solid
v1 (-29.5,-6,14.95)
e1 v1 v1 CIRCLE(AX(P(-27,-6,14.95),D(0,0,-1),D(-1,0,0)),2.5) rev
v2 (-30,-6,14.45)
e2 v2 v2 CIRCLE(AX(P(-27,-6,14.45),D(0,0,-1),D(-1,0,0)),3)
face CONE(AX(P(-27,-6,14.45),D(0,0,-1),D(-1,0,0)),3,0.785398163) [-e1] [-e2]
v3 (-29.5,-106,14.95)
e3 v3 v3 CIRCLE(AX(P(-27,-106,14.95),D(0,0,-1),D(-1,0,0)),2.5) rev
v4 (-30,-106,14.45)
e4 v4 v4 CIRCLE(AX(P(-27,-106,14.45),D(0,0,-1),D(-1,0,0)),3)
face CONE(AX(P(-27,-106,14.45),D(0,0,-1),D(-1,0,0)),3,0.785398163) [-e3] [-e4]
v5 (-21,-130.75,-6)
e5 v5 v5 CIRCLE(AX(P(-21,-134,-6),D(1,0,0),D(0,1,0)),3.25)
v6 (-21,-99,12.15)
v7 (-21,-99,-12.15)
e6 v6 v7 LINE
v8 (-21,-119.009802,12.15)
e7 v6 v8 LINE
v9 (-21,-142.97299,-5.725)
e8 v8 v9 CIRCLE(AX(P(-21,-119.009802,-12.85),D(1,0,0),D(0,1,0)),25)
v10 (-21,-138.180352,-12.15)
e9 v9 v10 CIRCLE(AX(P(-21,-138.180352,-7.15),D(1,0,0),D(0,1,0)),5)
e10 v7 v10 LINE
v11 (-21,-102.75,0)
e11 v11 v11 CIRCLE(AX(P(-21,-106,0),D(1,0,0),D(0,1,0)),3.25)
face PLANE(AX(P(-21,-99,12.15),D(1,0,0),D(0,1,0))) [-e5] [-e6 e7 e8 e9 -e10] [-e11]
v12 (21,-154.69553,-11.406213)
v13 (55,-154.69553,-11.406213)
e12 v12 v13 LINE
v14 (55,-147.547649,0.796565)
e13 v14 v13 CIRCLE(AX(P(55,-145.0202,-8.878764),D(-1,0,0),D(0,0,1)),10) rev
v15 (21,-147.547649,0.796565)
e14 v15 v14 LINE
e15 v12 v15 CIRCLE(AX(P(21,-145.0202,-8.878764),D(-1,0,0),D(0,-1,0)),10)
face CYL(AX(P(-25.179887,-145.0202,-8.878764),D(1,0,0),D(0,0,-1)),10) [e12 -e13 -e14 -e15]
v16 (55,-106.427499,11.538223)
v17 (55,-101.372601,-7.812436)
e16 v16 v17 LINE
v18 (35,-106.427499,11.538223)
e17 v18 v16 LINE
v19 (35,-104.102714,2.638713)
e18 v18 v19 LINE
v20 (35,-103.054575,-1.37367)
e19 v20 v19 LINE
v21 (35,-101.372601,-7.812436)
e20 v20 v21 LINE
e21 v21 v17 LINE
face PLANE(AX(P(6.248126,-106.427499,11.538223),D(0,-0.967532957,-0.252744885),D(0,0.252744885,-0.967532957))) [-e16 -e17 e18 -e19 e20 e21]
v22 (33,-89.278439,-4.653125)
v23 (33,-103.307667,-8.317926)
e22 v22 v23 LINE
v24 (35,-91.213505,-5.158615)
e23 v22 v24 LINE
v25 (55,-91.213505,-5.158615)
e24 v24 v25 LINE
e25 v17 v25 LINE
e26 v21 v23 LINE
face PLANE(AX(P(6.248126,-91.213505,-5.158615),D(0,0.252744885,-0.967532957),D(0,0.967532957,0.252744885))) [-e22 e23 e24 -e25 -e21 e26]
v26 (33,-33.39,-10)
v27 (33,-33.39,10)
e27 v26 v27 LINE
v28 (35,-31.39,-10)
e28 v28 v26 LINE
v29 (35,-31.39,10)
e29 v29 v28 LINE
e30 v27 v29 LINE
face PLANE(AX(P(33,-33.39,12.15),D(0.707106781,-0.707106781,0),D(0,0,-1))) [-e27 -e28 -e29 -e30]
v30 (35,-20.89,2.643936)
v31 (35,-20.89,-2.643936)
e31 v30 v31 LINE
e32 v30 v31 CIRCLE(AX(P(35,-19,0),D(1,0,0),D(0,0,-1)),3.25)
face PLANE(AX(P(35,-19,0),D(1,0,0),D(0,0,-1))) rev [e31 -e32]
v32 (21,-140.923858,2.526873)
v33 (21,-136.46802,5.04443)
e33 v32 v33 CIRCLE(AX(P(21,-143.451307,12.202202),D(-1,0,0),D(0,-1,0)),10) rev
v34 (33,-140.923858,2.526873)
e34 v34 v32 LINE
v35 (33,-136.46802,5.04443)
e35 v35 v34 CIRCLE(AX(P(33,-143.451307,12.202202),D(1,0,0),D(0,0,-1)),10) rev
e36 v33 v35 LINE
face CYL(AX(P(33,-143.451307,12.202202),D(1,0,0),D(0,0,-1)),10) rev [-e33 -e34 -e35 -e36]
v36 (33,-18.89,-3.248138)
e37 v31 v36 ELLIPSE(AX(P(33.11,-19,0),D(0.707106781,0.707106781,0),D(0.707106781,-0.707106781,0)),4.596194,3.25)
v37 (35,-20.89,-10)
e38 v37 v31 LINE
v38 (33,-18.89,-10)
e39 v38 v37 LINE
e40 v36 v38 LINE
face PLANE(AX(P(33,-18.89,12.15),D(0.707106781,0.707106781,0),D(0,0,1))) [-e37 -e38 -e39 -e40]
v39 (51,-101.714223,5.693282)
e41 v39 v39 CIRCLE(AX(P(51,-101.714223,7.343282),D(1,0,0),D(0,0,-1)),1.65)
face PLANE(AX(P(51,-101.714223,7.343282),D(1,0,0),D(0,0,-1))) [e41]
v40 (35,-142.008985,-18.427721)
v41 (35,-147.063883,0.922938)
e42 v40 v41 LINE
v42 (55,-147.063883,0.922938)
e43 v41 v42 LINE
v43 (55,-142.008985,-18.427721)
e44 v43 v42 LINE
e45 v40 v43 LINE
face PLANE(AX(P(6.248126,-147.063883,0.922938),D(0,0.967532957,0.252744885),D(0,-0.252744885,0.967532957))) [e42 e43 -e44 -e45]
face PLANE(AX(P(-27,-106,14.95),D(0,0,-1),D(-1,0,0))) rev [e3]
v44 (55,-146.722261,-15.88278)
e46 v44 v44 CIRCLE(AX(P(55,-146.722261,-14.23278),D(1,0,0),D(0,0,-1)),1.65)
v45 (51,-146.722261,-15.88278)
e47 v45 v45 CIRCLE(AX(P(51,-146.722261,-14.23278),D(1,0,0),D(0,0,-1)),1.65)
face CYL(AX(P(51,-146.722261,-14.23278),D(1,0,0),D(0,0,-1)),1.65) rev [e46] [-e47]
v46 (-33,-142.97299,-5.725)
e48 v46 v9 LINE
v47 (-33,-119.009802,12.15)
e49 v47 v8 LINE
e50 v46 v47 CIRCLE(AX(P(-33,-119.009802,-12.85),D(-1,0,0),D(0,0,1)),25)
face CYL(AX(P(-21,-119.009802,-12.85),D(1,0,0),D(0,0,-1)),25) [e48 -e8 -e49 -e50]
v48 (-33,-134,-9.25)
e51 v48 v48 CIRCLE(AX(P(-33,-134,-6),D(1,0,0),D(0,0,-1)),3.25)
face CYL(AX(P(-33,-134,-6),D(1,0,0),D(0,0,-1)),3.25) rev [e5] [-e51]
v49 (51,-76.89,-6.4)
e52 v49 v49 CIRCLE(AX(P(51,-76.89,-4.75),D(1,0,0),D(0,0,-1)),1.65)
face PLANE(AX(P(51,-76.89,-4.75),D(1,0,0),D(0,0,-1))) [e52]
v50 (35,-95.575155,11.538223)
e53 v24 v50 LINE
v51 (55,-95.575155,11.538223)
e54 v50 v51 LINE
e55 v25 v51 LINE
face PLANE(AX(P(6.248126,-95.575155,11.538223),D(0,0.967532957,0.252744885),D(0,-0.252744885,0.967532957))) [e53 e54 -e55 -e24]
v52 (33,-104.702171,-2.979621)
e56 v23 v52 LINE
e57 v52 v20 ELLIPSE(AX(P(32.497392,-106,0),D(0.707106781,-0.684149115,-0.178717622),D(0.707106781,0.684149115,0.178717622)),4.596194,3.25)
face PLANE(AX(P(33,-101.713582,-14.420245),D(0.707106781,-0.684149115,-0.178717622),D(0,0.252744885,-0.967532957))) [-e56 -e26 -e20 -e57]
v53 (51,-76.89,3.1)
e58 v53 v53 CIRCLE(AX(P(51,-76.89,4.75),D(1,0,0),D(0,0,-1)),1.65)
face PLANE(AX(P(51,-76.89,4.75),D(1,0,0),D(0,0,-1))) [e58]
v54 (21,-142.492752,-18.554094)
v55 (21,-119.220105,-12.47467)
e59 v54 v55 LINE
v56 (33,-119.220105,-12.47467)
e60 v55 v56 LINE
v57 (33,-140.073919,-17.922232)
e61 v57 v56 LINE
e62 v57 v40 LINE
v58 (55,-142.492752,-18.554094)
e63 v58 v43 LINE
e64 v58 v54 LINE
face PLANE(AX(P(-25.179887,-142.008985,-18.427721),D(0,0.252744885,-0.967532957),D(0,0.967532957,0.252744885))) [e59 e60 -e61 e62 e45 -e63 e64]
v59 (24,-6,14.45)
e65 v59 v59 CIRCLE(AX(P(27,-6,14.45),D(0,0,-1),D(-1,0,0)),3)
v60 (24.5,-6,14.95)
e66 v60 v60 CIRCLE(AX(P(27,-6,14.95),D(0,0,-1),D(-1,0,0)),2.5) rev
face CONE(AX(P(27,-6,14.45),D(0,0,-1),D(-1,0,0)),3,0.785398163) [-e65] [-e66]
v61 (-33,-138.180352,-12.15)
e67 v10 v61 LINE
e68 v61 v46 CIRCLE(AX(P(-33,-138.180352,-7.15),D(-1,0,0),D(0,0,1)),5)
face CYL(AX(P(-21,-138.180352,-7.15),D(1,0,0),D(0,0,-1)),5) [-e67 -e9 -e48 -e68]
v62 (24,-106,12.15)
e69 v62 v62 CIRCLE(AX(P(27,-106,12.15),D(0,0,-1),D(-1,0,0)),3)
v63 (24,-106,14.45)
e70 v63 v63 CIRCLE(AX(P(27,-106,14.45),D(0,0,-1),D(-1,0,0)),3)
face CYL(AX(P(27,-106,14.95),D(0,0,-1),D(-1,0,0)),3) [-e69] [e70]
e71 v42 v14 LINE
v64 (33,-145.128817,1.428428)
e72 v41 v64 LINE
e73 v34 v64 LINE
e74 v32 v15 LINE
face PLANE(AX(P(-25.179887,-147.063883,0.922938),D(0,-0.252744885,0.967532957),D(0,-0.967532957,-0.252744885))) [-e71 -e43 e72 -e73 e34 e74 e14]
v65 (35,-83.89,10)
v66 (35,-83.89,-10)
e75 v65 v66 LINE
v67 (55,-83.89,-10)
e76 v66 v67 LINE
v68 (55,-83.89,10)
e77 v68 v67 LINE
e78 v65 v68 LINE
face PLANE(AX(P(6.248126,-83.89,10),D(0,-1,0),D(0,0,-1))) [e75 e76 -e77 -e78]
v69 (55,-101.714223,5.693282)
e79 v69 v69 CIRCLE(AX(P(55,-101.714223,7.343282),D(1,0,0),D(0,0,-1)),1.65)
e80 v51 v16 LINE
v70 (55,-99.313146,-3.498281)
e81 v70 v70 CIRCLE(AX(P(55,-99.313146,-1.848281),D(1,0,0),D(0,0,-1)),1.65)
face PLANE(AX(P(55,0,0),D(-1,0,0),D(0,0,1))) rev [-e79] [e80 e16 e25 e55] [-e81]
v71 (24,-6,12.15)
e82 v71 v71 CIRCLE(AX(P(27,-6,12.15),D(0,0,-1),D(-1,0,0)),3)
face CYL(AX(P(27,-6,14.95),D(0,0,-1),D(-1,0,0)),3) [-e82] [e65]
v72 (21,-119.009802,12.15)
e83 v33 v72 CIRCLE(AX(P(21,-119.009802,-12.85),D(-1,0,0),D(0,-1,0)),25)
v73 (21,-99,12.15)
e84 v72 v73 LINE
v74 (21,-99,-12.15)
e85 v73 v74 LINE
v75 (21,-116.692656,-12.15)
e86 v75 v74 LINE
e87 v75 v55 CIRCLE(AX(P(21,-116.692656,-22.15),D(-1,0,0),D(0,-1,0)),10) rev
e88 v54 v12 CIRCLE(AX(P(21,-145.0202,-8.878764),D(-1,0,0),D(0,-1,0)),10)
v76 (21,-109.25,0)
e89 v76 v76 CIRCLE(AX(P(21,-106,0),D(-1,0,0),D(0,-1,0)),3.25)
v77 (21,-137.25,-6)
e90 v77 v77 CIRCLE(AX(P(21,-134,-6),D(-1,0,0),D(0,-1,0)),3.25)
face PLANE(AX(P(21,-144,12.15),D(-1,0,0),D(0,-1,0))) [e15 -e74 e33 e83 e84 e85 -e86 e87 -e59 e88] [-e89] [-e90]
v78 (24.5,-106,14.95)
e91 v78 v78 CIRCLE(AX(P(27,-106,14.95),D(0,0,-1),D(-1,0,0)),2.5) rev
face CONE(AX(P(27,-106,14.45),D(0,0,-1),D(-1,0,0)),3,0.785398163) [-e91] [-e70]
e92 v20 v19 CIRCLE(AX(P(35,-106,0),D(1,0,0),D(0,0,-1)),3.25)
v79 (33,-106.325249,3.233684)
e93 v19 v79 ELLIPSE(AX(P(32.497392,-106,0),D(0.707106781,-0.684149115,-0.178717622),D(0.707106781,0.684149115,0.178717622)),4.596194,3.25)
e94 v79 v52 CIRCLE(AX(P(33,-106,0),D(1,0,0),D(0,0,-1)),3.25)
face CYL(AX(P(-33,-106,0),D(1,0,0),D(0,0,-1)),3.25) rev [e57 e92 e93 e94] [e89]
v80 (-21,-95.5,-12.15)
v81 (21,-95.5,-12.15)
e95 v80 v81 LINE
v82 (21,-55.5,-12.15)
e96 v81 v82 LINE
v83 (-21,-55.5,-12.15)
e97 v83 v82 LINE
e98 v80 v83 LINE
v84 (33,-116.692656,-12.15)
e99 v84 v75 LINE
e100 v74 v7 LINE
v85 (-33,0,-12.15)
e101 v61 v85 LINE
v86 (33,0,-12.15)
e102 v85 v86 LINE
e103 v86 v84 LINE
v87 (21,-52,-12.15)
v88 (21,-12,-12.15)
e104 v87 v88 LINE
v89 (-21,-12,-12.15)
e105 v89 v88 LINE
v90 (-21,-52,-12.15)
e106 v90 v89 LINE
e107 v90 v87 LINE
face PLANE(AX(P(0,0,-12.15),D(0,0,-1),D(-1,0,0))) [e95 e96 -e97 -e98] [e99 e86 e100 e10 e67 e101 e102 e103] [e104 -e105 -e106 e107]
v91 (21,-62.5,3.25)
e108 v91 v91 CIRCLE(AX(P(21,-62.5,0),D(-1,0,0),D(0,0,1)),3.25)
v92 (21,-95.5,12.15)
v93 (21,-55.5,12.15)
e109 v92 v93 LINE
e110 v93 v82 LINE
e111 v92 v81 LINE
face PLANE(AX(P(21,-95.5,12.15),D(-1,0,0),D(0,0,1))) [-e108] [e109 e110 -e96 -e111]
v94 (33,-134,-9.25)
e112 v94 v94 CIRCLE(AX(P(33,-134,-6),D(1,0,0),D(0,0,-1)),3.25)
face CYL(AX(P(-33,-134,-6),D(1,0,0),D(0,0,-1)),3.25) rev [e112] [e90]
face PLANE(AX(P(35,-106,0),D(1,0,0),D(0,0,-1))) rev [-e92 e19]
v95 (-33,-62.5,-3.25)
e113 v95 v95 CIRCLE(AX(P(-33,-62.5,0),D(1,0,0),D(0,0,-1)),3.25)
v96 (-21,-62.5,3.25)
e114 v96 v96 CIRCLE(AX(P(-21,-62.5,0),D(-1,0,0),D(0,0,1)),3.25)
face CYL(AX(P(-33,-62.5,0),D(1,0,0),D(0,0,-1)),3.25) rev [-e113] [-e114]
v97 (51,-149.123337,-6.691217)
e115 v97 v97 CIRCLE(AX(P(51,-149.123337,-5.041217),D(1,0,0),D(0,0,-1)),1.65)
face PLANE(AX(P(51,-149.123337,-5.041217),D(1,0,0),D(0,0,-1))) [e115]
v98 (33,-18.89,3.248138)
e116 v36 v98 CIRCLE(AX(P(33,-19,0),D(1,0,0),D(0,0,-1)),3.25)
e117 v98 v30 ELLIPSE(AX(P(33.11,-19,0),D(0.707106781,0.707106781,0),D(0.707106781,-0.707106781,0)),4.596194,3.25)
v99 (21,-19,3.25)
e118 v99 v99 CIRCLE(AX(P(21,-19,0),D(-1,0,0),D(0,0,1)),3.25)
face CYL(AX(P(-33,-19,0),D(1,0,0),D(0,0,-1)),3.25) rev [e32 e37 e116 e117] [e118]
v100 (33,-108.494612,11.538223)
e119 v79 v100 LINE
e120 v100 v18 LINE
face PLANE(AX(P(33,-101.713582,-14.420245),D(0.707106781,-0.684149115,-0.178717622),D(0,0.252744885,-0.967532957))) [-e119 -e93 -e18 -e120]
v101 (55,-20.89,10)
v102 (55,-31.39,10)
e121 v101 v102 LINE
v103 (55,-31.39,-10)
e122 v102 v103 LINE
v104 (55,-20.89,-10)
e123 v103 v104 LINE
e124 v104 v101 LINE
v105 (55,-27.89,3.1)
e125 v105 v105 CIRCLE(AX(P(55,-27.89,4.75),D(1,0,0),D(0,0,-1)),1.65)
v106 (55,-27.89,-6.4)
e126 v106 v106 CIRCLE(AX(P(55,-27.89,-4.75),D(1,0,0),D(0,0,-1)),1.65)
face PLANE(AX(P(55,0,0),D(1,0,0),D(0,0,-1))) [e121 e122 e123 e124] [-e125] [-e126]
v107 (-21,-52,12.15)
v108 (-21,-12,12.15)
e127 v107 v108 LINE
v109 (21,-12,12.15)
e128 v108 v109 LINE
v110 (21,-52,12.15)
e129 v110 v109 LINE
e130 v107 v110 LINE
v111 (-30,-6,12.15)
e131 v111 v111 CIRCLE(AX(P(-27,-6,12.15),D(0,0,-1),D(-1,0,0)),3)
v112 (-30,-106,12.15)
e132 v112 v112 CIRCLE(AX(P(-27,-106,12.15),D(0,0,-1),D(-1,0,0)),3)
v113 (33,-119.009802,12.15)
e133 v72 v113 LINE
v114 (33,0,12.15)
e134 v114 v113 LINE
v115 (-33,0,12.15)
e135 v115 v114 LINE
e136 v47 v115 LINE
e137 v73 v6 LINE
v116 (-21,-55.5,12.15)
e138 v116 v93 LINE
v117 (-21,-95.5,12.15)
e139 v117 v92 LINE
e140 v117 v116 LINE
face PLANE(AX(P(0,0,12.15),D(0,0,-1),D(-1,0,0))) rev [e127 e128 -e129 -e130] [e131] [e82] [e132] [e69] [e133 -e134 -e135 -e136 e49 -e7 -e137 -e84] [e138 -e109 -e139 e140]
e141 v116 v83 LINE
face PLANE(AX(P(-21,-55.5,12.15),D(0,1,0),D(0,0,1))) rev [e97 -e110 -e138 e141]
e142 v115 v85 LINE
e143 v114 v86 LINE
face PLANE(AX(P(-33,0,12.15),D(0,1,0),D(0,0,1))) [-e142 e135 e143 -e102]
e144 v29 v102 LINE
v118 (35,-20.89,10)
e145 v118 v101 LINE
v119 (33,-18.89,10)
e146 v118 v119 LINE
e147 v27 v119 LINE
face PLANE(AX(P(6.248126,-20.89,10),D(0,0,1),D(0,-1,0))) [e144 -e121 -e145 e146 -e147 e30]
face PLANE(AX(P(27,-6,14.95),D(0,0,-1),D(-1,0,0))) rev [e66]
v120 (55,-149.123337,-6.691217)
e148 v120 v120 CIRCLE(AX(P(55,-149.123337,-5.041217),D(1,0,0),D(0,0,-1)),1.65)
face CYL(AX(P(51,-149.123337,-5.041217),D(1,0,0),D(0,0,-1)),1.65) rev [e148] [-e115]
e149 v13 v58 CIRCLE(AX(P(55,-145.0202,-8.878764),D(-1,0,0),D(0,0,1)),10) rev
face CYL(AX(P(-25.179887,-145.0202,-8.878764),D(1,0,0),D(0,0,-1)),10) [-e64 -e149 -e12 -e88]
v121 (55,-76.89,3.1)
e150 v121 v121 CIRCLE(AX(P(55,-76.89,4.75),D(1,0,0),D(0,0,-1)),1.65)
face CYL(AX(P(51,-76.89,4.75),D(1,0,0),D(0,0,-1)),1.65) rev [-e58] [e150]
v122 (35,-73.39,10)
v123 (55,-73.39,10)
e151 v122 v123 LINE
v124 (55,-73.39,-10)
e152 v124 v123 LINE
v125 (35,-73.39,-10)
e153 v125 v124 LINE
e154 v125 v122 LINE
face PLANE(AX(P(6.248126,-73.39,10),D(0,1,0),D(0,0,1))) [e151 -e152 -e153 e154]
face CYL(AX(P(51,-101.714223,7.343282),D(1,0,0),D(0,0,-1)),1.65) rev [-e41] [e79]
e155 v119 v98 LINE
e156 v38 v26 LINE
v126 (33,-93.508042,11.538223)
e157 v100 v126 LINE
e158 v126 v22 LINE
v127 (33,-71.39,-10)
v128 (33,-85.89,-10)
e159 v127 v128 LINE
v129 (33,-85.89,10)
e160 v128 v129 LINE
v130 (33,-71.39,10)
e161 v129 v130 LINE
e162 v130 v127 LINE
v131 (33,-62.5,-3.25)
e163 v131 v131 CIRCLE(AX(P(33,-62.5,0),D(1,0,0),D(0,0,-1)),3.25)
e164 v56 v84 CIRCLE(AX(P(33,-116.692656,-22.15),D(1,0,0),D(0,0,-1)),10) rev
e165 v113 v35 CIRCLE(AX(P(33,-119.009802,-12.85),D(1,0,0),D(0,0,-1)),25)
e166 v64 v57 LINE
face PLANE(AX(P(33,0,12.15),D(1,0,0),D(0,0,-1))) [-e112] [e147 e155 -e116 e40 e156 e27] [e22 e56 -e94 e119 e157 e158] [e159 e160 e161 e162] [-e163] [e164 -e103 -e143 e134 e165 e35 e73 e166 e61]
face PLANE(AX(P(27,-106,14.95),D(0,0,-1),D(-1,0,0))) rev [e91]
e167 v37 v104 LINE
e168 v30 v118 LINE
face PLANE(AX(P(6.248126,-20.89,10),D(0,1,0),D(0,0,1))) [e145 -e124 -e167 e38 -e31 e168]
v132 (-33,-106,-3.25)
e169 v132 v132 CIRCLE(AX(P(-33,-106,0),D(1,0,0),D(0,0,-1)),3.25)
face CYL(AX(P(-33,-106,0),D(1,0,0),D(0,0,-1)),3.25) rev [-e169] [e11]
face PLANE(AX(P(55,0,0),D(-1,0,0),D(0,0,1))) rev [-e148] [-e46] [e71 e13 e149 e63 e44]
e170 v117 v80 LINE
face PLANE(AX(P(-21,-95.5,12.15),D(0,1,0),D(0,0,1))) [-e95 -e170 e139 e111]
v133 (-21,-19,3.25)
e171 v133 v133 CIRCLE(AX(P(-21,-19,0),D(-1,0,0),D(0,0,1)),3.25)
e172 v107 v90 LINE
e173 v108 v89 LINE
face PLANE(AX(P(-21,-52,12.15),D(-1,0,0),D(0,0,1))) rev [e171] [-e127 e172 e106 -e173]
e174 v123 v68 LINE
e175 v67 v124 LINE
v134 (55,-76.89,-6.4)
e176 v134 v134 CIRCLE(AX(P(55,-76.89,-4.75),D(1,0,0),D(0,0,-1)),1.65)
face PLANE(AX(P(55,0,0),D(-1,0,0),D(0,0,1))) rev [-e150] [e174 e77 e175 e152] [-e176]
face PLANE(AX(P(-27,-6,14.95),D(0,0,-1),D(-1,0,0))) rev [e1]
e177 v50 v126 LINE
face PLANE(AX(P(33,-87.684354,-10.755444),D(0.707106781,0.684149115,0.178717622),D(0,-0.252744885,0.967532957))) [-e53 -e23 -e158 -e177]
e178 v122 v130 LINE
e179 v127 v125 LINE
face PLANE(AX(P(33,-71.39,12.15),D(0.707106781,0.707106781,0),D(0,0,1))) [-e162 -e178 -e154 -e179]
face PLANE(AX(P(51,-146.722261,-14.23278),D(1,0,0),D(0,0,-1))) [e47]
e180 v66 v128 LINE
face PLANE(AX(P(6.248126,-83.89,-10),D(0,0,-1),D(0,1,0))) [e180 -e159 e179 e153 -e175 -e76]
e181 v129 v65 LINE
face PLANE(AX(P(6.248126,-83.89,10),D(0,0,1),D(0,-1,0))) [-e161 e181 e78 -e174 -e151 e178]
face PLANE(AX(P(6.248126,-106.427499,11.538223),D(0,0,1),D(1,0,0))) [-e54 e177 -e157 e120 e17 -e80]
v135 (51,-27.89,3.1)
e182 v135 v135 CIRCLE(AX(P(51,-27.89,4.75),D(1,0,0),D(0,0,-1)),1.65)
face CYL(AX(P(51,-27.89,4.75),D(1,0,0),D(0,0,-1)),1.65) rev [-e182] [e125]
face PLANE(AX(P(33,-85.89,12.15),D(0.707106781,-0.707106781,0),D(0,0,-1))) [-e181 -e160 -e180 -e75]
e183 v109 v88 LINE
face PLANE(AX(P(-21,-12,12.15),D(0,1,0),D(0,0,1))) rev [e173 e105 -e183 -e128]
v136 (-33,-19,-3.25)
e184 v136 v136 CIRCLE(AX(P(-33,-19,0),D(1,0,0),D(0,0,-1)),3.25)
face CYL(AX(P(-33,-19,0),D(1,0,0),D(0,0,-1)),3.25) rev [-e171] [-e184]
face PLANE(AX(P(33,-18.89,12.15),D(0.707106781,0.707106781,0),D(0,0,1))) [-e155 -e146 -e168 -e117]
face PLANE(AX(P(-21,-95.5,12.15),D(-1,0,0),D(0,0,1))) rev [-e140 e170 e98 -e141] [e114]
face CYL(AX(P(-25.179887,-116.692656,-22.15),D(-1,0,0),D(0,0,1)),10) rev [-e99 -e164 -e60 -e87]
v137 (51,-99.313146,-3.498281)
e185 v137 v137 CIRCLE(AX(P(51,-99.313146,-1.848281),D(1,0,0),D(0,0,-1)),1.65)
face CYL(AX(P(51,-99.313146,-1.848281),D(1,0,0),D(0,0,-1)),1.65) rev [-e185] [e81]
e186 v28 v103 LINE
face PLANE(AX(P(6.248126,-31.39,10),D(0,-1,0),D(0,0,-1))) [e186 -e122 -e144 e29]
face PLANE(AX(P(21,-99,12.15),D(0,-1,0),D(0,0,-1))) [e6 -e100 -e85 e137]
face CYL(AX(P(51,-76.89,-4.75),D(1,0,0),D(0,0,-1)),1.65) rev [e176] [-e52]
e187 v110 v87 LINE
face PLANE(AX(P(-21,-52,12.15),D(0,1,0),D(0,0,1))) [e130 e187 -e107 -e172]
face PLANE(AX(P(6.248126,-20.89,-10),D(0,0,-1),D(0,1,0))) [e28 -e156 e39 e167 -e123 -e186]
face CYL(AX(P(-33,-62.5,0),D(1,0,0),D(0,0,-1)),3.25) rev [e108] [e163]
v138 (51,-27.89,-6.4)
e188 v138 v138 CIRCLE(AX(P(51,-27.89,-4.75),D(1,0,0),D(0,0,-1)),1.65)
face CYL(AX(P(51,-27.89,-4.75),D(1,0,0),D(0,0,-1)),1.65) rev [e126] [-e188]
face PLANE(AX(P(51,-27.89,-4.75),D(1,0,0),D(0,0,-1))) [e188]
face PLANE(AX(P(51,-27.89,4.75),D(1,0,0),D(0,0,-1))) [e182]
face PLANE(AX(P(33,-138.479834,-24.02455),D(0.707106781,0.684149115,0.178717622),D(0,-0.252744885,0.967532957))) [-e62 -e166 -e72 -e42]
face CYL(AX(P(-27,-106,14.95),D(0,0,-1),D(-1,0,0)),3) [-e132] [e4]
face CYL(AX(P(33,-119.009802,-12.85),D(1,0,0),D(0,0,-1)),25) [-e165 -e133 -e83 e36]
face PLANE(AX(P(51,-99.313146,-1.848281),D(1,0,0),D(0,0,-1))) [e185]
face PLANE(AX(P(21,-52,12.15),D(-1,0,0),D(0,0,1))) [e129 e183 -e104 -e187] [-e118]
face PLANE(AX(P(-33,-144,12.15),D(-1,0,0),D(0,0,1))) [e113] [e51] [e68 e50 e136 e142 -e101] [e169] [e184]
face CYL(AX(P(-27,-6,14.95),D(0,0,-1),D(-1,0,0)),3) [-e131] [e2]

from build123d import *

# Parameters (mm, degrees)
SKETCH2_W               = 42
SKETCH2_H               = 40
BOSS_EXTRUDE1_DEPTH     = 12.15
CUT_EXTRUDE1_DEPTH      = 149.231651478
CUT_EXTRUDE1_DEPTH_BACK = 149.231651478
SKETCH3_R               = 3.25
FILLET1_R               = 25
FILLET2_R               = 5
SKETCH4_R               = 3
BOSS_EXTRUDE2_DEPTH     = 2.8
CHAMFER1_SIZE           = 0.5
SKETCH6_W               = 20
SKETCH6_H               = 10.5
BOSS_EXTRUDE3_DEPTH     = 22
BOSS_EXTRUDE5_DEPTH     = 12
SKETCH7_R               = 1.65
CUT_EXTRUDE2_DEPTH      = 4
FILLET3_R               = 10
CHAMFER3_SIZE           = 2
SKETCH9_R               = 3.25
CUT_EXTRUDE3_DEPTH      = 2


# Some blends are built 0.0001 mm under size
with BuildPart() as part:
    # Sketch2 → Boss-Extrude1 (new, symmetric)
    with BuildSketch(Plane.XY):
        Polygon((-33, 0), (33, 0), (33, -144), (21, -144), (21, -99), (-21, -99), (-21, -144), (-33, -144), align=None)
        with Locations((0, -32)):
            Rectangle(SKETCH2_W, SKETCH2_H, mode=Mode.SUBTRACT)
        with Locations((0, -75.5)):
            Rectangle(SKETCH2_W, SKETCH2_H, mode=Mode.SUBTRACT)
    extrude(amount=BOSS_EXTRUDE1_DEPTH, both=True)

    # Sketch3 → Cut-Extrude1 (cut, two sides: drawn at the far end of the back side and taken through both)
    with BuildSketch(Plane(origin=(0, 0, 0), x_dir=(0, 0, -1), z_dir=(1, 0, 0)).offset(-CUT_EXTRUDE1_DEPTH_BACK)):
        with Locations((0, -106)):
            Circle(SKETCH3_R)
        with Locations((0, -62.5)):
            Circle(SKETCH3_R)
        with Locations((0, -19)):
            Circle(SKETCH3_R)
        with Locations((6, -134)):
            Circle(SKETCH3_R)
    extrude(amount=CUT_EXTRUDE1_DEPTH + CUT_EXTRUDE1_DEPTH_BACK, mode=Mode.SUBTRACT)

    # Fillet1
    # the kernel refuses this fillet: 25 mm, written as the material it takes off along each edge
    with BuildSketch(Plane(origin=(95.475495196, -144, 12.15), x_dir=(0, 1, 0), z_dir=(-1, 0, 0)), Plane(origin=(41.475495196, -144, 12.15), x_dir=(0, 1, 0), z_dir=(-1, 0, 0))) as fillet1_piece_1:
        with BuildLine():
            CenterArc((24.990198078, 25), FILLET1_R, 181.604491527, 88.395508473)
            Line((0, 24.3), (-0.499803962, 24.286))
            ThreePointArc((-0.499803962, 24.286), (-0.5, 12.15), (-0.5, 0))
            Line((-0.5, 0), (0, -0.5))
            Line((0, -0.5), (24.990198078, -0.5))
            Line((24.990198078, -0.5), (24.990198078, 0))
        make_face()
    extrude(amount=136.950990392, mode=Mode.SUBTRACT)

    # Fillet2
    fillet2_edges = [part.edges().sort_by_distance(p)[0] for p in [
        (-27, -144, -12.15),
        (27, -144, -12.15),
    ]]
    fillet(fillet2_edges, radius=FILLET2_R)

    # Sketch4 → Boss-Extrude2 (add)
    with BuildSketch(Plane(origin=(0, 0, 12.15), x_dir=(-1, 0, 0), z_dir=(0, 0, -1))):
        with Locations((-27, -6)):
            Circle(SKETCH4_R)
        with Locations((27, -6)):
            Circle(SKETCH4_R)
        with Locations((27, -106)):
            Circle(SKETCH4_R)
        with Locations((-27, -106)):
            Circle(SKETCH4_R)
    extrude(amount=-BOSS_EXTRUDE2_DEPTH)

    # Chamfer1
    chamfer1_edges = [part.edges().sort_by_distance(p)[0] for p in [
        (30, -6, 14.95),
        (-24, -6, 14.95),
        (-24, -106, 14.95),
        (30, -106, 14.95),
    ]]
    chamfer(chamfer1_edges, length=CHAMFER1_SIZE)

    # Sketch6 → Boss-Extrude3 (add)
    with BuildSketch(Plane(origin=(55, 0, 0), x_dir=(0, 0, -1), z_dir=(1, 0, 0))):
        with Locations((0, -26.14)):
            Rectangle(SKETCH6_W, SKETCH6_H)
        with Locations((0, -78.64)):
            Rectangle(SKETCH6_W, SKETCH6_H)
        Polygon((-0.922937771, -147.063882754), (18.427721371, -142.00898505), (21.081542665, -152.168081099), (1.730883524, -157.222978804), align=None)
        Polygon((-11.538222949, -95.575155055), (5.158614897, -91.213504805), (7.812436192, -101.372600854), (-11.538222949, -106.427498558), align=None)
    extrude(amount=-BOSS_EXTRUDE3_DEPTH)


with BuildPart() as boss_extrude3_piece_1:
    # of the separate pieces the step leaves, piece 1, a body of its own (boss_extrude3_pieces)
    add(part.part.solids().sort_by_distance((24, -106, 14.45))[0])



with BuildPart() as boss_extrude3_piece_2:
    # of the separate pieces the step leaves, piece 2, a body of its own (boss_extrude3_pieces)
    add(part.part.solids().sort_by_distance((55, -147.063882754, 0.922937771))[0])


with BuildPart() as boss_extrude3_piece_1_1:
    add(boss_extrude3_piece_1.part)

    add(boss_extrude3_piece_2.part)  # Boss-Extrude5 merges Boss-Extrude3 piece 2
    # Sketch8 → Boss-Extrude5 (add)
    with BuildSketch(Plane(origin=(33, 0, 0), x_dir=(0, 0, -1), z_dir=(1, 0, 0))):
        with BuildLine():
            Line((-0.922937771, -147.063882754), (-3.256769685, -138.129738384))
            ThreePointArc((-3.256769685, -138.129738384), (0.984375203, -141.014504786), (5.725, -142.972989836))
            ThreePointArc((5.725, -142.972989836), (10.139565186, -142.188157138), (12.15, -138.180352253))
            Line((12.15, -138.180352253), (12.15, -117.977233364))
            Line((12.15, -117.977233364), (18.427721371, -142.00898505))
            Line((18.427721371, -142.00898505), (21.081542665, -152.168081099))
            Line((21.081542665, -152.168081099), (1.730883524, -157.222978804))
            Line((1.730883524, -157.222978804), (-0.922937771, -147.063882754))
        make_face()
    extrude(amount=-BOSS_EXTRUDE5_DEPTH)

    # Sketch7 → Cut-Extrude2 (cut)
    with BuildSketch(Plane(origin=(55, 0, 0), x_dir=(0, 0, -1), z_dir=(1, 0, 0))):
        with Locations((-4.75, -27.89)):
            Circle(SKETCH7_R)
        with Locations((4.75, -27.89)):
            Circle(SKETCH7_R)
        with Locations((-4.75, -76.89)):
            Circle(SKETCH7_R)
        with Locations((4.75, -76.89)):
            Circle(SKETCH7_R)
        with Locations((-7.343282023, -101.714222561)):
            Circle(SKETCH7_R)
        with Locations((1.848281069, -99.313146151)):
            Circle(SKETCH7_R)
        with Locations((5.041217352, -149.123337457)):
            Circle(SKETCH7_R)
        with Locations((14.232780444, -146.722261047)):
            Circle(SKETCH7_R)
    extrude(amount=-CUT_EXTRUDE2_DEPTH, mode=Mode.SUBTRACT)

    # Fillet3
    fillet3_edges = [boss_extrude3_piece_1_1.edges().sort_by_distance(p)[0] for p in [
        (38, -157.222978804, -1.730883524),
        (38, -152.168081099, -21.081542665),
        (27, -117.977233364, -12.15),
        (27, -138.129738384, 3.256769685),
    ]]
    fillet(fillet3_edges, radius=FILLET3_R - 0.0001)  # a hair under: the kernel refuses the full size

    # Chamfer3
    # the kernel refuses this chamfer: 2 mm, written as the material it adds along each edge
    with BuildSketch(Plane(origin=(33, -20.89, 2.499429517), x_dir=(-0.027495876610585647, 0.9996219169112968, 0), z_dir=(0, 0, -1))) as chamfer3_piece_1_section:
        Polygon((CHAMFER3_SIZE * 0.999621916911, CHAMFER3_SIZE * 0.0274958766106), (-CHAMFER3_SIZE * 0.0274958766106, CHAMFER3_SIZE * 0.999621916911), (0, 0), align=None)
    chamfer3_piece_1 = extrude(amount=12.499429517, mode=Mode.PRIVATE)
    chamfer3_piece_1 = chamfer3_piece_1 - Plane(origin=(33.672455273, -19, 0), x_dir=(0, 0, -1), z_dir=(-1, 0, 0)) * Cylinder(3.25, 33, mode=Mode.PRIVATE)
    add(chamfer3_piece_1)
    with BuildSketch(Plane(origin=(33, -20.89, 10), x_dir=(-0.027495876610585647, 0.9996219169112968, 0), z_dir=(0, 0, -1))) as chamfer3_piece_2_section:
        Polygon((CHAMFER3_SIZE * 0.999621916911, CHAMFER3_SIZE * 0.0274958766106), (-CHAMFER3_SIZE * 0.0274958766106, CHAMFER3_SIZE * 0.999621916911), (0, 0), align=None)
    chamfer3_piece_2 = extrude(amount=12.499429517, mode=Mode.PRIVATE)
    chamfer3_piece_2 = chamfer3_piece_2 - Plane(origin=(33.672455268, -19, 0), x_dir=(0, 0, -1), z_dir=(-1, 0, 0)) * Cylinder(3.25, 33, mode=Mode.PRIVATE)
    add(chamfer3_piece_2)
    with BuildSketch(Plane(origin=(33, -31.39, -10), x_dir=(-0.027495876610585647, -0.9996219169112968, 0), z_dir=(0, 0, 1)), Plane(origin=(33, -73.39, 10), x_dir=(-0.02749587661058555, 0.9996219169112968, 0), z_dir=(0, 0, -1)), Plane(origin=(33, -83.89, -10), x_dir=(-0.02749587661058555, -0.9996219169112968, 0), z_dir=(0, 0, 1)), Plane(origin=(33, -147.063882754, 0.922937771), x_dir=(-0.02749587661058553, 0.9671671492128019, 0.25264932664267514), z_dir=(0, 0.2527448852095291, -0.96753295706163))) as chamfer3_piece_3:
        Polygon((CHAMFER3_SIZE * 0.999621916911, CHAMFER3_SIZE * 0.0274958766106), (-CHAMFER3_SIZE * 0.0274958766106, CHAMFER3_SIZE * 0.999621916911), (0, 0), align=None)
    extrude(amount=20)
    with BuildSketch(Plane(origin=(33, -102.802754601, -2.337663147), x_dir=(-0.027495876610585706, -0.9671671492128018, -0.25264932664267636), z_dir=(0, -0.2527448852095303, 0.9675329570616298))) as chamfer3_piece_4_section:
        Polygon((CHAMFER3_SIZE * 0.999621916911, CHAMFER3_SIZE * 0.0274958766106), (-CHAMFER3_SIZE * 0.0274958766106, CHAMFER3_SIZE * 0.999621916911), (0, 0), align=None)
    chamfer3_piece_4 = extrude(amount=19.484878578, mode=Mode.PRIVATE)
    chamfer3_piece_4 = chamfer3_piece_4 - Plane(origin=(33.819409297, -106, 0), x_dir=(0, 0, -1), z_dir=(-1, 0, 0)) * Cylinder(3.25, 47, mode=Mode.PRIVATE)
    chamfer3_piece_4 = split(chamfer3_piece_4, bisect_by=Plane(origin=(33.819409297, -103.234814786, 11.538222949), z_dir=(0, 0, -1)), keep=Keep.TOP, mode=Mode.PRIVATE)
    add(chamfer3_piece_4)
    with BuildSketch(Plane(origin=(33, -96.875114499, 16.514599041), x_dir=(-0.027495876610585716, 0.967167149212802, 0.2526493266426752), z_dir=(0, 0.2527448852095292, -0.96753295706163))) as chamfer3_piece_5_section:
        Polygon((CHAMFER3_SIZE * 0.999621916911, CHAMFER3_SIZE * 0.0274958766106), (-CHAMFER3_SIZE * 0.0274958766106, CHAMFER3_SIZE * 0.999621916911), (0, 0), align=None)
    chamfer3_piece_5 = extrude(amount=22.400491663, mode=Mode.PRIVATE)
    chamfer3_piece_5 = split(chamfer3_piece_5, bisect_by=Plane(origin=(33.668365734, -92.730700089, 11.538222949), z_dir=(0, 0, -1)), keep=Keep.TOP, mode=Mode.PRIVATE)
    add(chamfer3_piece_5)
    with BuildSketch(Plane(origin=(33, -101.372600854, -7.812436192), x_dir=(-0.027495876610585706, -0.9671671492128017, -0.25264932664267636), z_dir=(0, -0.2527448852095303, 0.9675329570616298))) as chamfer3_piece_6_section:
        Polygon((CHAMFER3_SIZE * 0.999621916911, CHAMFER3_SIZE * 0.0274958766106), (-CHAMFER3_SIZE * 0.0274958766106, CHAMFER3_SIZE * 0.999621916911), (0, 0), align=None)
    chamfer3_piece_6 = extrude(amount=11.798194515, mode=Mode.PRIVATE)
    chamfer3_piece_6 = chamfer3_piece_6 - Plane(origin=(33.67836444, -106, 0), x_dir=(0, 0, -1), z_dir=(-1, 0, 0)) * Cylinder(3.25, 32, mode=Mode.PRIVATE)
    add(chamfer3_piece_6)

    # Sketch9 → Cut-Extrude3 (cut)
    with BuildSketch(Plane(origin=(33, 0, 0), x_dir=(0, 0, -1), z_dir=(1, 0, 0))):
        with Locations((0, -19)):
            Circle(SKETCH9_R)
        with Locations((0, -106)):
            Circle(SKETCH9_R)
    extrude(amount=CUT_EXTRUDE3_DEPTH, mode=Mode.SUBTRACT)


solid = boss_extrude3_piece_1_1.part
